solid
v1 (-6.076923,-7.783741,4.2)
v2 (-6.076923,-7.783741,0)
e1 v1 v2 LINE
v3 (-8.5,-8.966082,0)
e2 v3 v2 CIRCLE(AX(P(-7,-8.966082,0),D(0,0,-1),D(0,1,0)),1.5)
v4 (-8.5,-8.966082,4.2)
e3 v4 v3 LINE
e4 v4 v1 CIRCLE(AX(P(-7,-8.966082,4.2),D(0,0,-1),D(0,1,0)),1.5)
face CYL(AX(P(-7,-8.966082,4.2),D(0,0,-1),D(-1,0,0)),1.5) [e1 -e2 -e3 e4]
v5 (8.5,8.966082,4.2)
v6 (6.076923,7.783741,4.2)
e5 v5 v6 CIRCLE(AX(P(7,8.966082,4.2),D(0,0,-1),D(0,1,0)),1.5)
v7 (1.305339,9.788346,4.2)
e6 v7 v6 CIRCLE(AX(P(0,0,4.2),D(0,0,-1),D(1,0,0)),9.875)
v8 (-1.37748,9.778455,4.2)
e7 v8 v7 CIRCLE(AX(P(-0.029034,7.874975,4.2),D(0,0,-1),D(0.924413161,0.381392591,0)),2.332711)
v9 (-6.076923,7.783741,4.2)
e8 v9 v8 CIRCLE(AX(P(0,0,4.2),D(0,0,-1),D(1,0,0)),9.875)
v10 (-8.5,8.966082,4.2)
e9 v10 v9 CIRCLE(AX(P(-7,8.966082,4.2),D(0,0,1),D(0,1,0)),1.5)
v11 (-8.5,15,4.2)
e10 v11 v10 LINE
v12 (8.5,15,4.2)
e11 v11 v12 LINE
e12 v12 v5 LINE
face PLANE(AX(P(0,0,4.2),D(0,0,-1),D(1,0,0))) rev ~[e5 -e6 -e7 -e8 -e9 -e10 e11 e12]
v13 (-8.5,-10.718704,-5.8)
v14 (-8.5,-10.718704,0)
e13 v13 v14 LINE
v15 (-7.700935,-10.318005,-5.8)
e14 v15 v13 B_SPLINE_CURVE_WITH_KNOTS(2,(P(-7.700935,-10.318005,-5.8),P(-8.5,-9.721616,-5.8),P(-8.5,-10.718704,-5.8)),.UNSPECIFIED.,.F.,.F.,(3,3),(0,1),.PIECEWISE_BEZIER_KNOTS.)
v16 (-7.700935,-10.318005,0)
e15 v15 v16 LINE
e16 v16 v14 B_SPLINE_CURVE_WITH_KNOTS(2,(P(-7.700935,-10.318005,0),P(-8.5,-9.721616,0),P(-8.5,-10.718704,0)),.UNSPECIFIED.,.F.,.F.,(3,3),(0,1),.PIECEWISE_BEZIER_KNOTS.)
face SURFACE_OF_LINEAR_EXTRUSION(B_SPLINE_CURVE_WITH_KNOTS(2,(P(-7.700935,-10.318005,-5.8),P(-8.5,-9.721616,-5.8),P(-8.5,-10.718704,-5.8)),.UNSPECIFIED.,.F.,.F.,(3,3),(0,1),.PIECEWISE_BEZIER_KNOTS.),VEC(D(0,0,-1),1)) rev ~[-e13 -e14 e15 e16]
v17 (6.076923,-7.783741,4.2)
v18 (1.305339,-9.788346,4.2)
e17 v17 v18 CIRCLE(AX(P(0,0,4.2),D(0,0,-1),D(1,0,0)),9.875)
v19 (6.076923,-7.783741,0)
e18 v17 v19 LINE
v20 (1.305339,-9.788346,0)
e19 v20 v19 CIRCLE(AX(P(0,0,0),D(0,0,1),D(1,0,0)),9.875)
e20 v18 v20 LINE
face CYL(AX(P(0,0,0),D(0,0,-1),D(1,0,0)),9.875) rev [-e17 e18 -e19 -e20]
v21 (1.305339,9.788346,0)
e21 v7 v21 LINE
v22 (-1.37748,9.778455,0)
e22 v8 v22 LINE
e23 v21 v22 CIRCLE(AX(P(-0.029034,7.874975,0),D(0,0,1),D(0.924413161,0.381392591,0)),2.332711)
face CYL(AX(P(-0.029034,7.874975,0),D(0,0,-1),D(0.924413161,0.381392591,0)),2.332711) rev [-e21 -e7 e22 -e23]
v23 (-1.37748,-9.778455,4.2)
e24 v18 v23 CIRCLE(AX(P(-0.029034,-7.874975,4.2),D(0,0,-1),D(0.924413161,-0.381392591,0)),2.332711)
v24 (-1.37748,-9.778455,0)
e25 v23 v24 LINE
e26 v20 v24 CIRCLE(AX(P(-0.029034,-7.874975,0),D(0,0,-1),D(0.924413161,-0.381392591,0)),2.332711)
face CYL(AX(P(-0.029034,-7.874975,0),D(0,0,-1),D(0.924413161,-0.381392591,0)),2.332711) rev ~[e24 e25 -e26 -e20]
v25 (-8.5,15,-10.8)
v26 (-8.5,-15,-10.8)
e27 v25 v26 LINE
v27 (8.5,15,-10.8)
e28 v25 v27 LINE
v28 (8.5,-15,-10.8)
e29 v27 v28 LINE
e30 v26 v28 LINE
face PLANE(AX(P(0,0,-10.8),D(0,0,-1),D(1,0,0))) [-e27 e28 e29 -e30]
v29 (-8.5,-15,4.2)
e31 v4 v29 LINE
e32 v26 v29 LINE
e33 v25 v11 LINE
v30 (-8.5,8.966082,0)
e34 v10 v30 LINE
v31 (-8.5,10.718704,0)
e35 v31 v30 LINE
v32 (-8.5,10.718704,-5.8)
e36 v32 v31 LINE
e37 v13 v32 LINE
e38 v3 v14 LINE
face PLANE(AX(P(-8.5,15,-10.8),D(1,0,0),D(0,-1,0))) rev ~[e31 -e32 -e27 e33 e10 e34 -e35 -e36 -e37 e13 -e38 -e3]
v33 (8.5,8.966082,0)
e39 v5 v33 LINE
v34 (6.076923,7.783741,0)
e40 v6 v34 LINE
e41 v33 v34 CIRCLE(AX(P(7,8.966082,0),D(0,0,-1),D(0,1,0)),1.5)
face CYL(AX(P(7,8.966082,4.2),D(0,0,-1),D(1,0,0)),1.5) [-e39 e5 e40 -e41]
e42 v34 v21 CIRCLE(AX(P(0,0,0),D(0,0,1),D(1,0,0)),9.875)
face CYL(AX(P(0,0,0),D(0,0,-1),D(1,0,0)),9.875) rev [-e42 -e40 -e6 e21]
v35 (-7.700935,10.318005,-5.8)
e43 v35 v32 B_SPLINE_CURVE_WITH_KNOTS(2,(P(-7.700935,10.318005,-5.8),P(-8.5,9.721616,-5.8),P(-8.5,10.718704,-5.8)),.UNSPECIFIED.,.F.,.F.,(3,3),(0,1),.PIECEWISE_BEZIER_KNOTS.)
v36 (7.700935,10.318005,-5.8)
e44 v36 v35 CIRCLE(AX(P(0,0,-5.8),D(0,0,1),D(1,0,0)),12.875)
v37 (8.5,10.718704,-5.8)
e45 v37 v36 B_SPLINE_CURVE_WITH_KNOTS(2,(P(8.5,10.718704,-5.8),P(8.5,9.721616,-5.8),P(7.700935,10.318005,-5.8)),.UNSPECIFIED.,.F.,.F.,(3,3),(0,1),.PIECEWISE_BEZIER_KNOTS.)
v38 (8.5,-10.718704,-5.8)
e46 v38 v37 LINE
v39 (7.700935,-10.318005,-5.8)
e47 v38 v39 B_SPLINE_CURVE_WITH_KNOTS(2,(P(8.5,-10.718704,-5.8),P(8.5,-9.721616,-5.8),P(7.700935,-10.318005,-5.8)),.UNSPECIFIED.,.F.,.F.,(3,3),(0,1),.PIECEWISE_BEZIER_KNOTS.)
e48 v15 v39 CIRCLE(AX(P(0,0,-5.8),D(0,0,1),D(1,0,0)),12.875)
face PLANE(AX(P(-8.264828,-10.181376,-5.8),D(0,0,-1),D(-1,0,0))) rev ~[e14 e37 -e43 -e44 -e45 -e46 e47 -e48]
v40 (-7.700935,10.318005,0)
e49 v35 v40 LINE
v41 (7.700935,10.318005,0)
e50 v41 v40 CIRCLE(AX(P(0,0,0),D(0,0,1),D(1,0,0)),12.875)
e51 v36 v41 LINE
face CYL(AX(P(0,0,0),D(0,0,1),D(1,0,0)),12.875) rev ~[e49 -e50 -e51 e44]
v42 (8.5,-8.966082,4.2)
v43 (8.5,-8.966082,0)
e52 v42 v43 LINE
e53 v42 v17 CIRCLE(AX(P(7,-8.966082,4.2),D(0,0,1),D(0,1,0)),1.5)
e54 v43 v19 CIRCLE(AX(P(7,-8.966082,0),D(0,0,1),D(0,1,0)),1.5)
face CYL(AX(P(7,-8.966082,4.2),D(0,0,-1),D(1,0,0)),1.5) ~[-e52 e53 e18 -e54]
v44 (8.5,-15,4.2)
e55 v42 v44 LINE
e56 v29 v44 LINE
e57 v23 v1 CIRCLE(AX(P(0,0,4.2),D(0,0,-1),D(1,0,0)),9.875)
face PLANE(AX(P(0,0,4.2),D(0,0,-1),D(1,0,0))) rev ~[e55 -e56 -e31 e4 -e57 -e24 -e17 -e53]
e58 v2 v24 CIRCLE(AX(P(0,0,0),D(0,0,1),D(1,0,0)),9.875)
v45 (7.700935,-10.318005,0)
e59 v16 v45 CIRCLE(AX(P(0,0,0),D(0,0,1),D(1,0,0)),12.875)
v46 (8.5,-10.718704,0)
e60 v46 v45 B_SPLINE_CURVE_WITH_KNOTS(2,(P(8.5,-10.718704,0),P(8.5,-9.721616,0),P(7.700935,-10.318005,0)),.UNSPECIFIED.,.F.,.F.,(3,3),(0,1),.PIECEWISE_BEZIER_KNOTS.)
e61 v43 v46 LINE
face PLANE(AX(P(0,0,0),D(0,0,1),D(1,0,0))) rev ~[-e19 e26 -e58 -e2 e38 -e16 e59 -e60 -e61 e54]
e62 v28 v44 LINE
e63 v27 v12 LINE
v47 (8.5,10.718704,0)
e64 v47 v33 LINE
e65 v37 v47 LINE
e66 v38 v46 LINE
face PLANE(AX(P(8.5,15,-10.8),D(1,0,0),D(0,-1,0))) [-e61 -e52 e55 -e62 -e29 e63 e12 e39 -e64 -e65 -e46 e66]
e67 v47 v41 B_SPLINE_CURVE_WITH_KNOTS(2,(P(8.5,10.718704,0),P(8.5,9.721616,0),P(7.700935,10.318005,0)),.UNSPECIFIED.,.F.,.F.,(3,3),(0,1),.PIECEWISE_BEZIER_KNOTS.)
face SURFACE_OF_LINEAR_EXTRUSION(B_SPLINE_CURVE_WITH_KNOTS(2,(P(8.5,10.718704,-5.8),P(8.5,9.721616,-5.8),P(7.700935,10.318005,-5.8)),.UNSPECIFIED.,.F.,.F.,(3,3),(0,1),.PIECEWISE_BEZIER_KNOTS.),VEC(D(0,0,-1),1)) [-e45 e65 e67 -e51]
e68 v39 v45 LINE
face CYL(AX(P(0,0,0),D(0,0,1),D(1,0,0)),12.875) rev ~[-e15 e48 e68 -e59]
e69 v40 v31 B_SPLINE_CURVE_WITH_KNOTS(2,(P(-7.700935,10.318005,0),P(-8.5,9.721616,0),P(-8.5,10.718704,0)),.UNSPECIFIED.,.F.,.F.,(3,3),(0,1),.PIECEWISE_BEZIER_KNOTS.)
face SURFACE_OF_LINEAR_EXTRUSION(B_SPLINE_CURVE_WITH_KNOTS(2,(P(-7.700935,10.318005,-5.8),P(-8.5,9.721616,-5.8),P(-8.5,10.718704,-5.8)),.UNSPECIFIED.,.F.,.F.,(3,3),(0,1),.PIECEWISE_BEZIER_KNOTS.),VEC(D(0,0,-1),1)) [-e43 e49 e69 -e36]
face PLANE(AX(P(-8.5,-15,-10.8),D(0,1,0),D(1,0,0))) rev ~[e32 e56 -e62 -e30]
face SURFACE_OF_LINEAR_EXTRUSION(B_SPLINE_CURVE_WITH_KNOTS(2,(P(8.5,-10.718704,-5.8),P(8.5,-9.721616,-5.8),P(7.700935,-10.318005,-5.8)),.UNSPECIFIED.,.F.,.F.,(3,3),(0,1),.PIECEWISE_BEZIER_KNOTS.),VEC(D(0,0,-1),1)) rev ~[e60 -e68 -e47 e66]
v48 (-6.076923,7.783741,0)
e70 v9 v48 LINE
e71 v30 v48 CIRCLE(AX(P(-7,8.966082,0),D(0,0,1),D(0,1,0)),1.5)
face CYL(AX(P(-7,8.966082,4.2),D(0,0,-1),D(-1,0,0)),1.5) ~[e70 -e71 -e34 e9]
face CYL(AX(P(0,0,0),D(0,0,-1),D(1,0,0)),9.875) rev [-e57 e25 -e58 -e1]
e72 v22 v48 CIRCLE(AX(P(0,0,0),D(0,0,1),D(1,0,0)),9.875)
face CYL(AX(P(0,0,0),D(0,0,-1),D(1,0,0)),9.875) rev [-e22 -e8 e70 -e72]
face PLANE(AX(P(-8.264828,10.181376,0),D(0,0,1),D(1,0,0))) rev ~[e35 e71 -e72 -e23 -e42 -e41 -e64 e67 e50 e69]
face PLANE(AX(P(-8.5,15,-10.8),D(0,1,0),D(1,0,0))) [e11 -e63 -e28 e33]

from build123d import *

# Parameters (mm, degrees)
F0_R         = 12.875
F1_DEPTH     = 5.8
F2_R         = 9.875
F3_DEPTH     = 12
F5_DEPTH     = 5
F7_W         = 30
F7_H         = 30
F7_W_2       = 18
F7_H_2       = 27
F8_DEPTH     = 10
F15_W        = 17
F15_H        = 30
F16_DEPTH    = 15
F18_R        = 1.5
F19_T1_DEPTH = 5.8


# Not quite as in the source:
# - a fillet or chamfer that OpenCascade refuses, or shapes differently, is made with other operations: its cross-section is extruded or revolved along the edge and cut away or added
# - a feature names something its author has since deleted; it is built from what else it names


with BuildPart() as f1:
    # F0 (on Top) → F1 (new body)
    with BuildSketch(Plane.XY):
        Circle(F0_R)
    extrude(amount=-F1_DEPTH)

    # F2 (on Top) → F3 (join)
    with BuildSketch(Plane.XY):
        Circle(F2_R)
    extrude(amount=F3_DEPTH)


with BuildPart() as f5:
    # F4 (on Top) → F5 (new body)
    with BuildSketch(Plane.XY):
        with BuildLine():
            ThreePointArc((-2.19192449, 8.7487287819), (-0.0332522533, 9.0190732649), (2.1273547272, 8.7646534521))
            ThreePointArc((2.1273547272, 8.7646534521), (-0.0376344683, 10.2076699565), (-2.19192449, 8.7487287819))
        make_face()
    extrude(amount=F5_DEPTH)


with BuildPart() as f6_1:
    # F6: instance of F5
    add(f5.part.mirror(Plane.XZ))


with BuildPart() as f8:
    # F7 (on Top) → F8 (new body, symmetric)
    with BuildSketch(Plane.XY):
        Rectangle(F7_W, F7_H)
        Rectangle(F7_W_2, F7_H_2, mode=Mode.SUBTRACT)
    extrude(amount=F8_DEPTH, both=True)


with BuildPart() as f1_1:
    add(f1.part)

    # F9: cut F8
    add(f8.part, mode=Mode.SUBTRACT)


with BuildPart() as f16:
    # F15 (on face) → F16 (new body)
    with BuildSketch(Plane(origin=(0, 0, -10.8), x_dir=(1, 0, 0), z_dir=(0, 0, -1))):
        Rectangle(F15_W, F15_H)
    extrude(amount=-F16_DEPTH)

    # F17: cut F6_1, F5, F1
    add(f6_1.part, mode=Mode.SUBTRACT)
    add(f5.part, mode=Mode.SUBTRACT)
    add(f1_1.part, mode=Mode.SUBTRACT)

    # F18
    f18_edges = [f16.edges().sort_by_distance(p)[0] for p in [
        (8.5, -5.026492, 2.1),
        (8.5, 5.026492, 2.1),
        (-8.5, 5.026492, 2.1),
        (-8.5, -5.026492, 2.1),
    ]]
    fillet(f18_edges, radius=F18_R)

    # F19: fillet of radius 0.5 on 4 edges, made by hand

    # F19_s2 → F19_t1 (cut)
    with BuildSketch(Plane.XY.offset(-5.8)):
        with BuildLine():
            add(Edge.make_bspline(
                [(-7.7009345794, 10.3180052143), (-8.5, 9.7216156603), (-8.5, 10.718704446)],
                knots=[0, 0, 0, 1, 1, 1], degree=2, weights=[1, 1, 1]))
            Line((-8.5, 10.718704446), (-8.5, 9.6703477187))
            ThreePointArc((-8.5, 9.6703477187), (-8.106937484, 10.0021592484), (-7.7009345794, 10.3180052143))
        make_face()
        with BuildLine():
            add(Edge.make_bspline(
                [(-7.7009345794, -10.3180052143), (-8.5, -9.7216156603), (-8.5, -10.718704446)],
                knots=[0, 0, 0, 1, 1, 1], degree=2, weights=[1, 1, 1]))
            Line((-8.5, -10.718704446), (-8.5, -9.6703477187))
            ThreePointArc((-8.5, -9.6703477187), (-8.106937484, -10.0021592484), (-7.7009345794, -10.3180052143))
        make_face()
        with BuildLine():
            add(Edge.make_bspline(
                [(8.5, 10.718704446), (8.5, 9.7216156603), (7.7009345794, 10.3180052143)],
                knots=[0, 0, 0, 1, 1, 1], degree=2, weights=[1, 1, 1]))
            ThreePointArc((7.7009345794, 10.3180052143), (8.106937484, 10.0021592484), (8.5, 9.6703477187))
            Line((8.5, 9.6703477187), (8.5, 10.718704446))
        make_face()
        with BuildLine():
            add(Edge.make_bspline(
                [(8.5, -10.718704446), (8.5, -9.7216156603), (7.7009345794, -10.3180052143)],
                knots=[0, 0, 0, 1, 1, 1], degree=2, weights=[1, 1, 1]))
            ThreePointArc((7.7009345794, -10.3180052143), (8.106937484, -10.0021592484), (8.5, -9.6703477187))
            Line((8.5, -9.6703477187), (8.5, -10.718704446))
        make_face()
    extrude(amount=F19_T1_DEPTH, mode=Mode.SUBTRACT)


solid = f16.part
